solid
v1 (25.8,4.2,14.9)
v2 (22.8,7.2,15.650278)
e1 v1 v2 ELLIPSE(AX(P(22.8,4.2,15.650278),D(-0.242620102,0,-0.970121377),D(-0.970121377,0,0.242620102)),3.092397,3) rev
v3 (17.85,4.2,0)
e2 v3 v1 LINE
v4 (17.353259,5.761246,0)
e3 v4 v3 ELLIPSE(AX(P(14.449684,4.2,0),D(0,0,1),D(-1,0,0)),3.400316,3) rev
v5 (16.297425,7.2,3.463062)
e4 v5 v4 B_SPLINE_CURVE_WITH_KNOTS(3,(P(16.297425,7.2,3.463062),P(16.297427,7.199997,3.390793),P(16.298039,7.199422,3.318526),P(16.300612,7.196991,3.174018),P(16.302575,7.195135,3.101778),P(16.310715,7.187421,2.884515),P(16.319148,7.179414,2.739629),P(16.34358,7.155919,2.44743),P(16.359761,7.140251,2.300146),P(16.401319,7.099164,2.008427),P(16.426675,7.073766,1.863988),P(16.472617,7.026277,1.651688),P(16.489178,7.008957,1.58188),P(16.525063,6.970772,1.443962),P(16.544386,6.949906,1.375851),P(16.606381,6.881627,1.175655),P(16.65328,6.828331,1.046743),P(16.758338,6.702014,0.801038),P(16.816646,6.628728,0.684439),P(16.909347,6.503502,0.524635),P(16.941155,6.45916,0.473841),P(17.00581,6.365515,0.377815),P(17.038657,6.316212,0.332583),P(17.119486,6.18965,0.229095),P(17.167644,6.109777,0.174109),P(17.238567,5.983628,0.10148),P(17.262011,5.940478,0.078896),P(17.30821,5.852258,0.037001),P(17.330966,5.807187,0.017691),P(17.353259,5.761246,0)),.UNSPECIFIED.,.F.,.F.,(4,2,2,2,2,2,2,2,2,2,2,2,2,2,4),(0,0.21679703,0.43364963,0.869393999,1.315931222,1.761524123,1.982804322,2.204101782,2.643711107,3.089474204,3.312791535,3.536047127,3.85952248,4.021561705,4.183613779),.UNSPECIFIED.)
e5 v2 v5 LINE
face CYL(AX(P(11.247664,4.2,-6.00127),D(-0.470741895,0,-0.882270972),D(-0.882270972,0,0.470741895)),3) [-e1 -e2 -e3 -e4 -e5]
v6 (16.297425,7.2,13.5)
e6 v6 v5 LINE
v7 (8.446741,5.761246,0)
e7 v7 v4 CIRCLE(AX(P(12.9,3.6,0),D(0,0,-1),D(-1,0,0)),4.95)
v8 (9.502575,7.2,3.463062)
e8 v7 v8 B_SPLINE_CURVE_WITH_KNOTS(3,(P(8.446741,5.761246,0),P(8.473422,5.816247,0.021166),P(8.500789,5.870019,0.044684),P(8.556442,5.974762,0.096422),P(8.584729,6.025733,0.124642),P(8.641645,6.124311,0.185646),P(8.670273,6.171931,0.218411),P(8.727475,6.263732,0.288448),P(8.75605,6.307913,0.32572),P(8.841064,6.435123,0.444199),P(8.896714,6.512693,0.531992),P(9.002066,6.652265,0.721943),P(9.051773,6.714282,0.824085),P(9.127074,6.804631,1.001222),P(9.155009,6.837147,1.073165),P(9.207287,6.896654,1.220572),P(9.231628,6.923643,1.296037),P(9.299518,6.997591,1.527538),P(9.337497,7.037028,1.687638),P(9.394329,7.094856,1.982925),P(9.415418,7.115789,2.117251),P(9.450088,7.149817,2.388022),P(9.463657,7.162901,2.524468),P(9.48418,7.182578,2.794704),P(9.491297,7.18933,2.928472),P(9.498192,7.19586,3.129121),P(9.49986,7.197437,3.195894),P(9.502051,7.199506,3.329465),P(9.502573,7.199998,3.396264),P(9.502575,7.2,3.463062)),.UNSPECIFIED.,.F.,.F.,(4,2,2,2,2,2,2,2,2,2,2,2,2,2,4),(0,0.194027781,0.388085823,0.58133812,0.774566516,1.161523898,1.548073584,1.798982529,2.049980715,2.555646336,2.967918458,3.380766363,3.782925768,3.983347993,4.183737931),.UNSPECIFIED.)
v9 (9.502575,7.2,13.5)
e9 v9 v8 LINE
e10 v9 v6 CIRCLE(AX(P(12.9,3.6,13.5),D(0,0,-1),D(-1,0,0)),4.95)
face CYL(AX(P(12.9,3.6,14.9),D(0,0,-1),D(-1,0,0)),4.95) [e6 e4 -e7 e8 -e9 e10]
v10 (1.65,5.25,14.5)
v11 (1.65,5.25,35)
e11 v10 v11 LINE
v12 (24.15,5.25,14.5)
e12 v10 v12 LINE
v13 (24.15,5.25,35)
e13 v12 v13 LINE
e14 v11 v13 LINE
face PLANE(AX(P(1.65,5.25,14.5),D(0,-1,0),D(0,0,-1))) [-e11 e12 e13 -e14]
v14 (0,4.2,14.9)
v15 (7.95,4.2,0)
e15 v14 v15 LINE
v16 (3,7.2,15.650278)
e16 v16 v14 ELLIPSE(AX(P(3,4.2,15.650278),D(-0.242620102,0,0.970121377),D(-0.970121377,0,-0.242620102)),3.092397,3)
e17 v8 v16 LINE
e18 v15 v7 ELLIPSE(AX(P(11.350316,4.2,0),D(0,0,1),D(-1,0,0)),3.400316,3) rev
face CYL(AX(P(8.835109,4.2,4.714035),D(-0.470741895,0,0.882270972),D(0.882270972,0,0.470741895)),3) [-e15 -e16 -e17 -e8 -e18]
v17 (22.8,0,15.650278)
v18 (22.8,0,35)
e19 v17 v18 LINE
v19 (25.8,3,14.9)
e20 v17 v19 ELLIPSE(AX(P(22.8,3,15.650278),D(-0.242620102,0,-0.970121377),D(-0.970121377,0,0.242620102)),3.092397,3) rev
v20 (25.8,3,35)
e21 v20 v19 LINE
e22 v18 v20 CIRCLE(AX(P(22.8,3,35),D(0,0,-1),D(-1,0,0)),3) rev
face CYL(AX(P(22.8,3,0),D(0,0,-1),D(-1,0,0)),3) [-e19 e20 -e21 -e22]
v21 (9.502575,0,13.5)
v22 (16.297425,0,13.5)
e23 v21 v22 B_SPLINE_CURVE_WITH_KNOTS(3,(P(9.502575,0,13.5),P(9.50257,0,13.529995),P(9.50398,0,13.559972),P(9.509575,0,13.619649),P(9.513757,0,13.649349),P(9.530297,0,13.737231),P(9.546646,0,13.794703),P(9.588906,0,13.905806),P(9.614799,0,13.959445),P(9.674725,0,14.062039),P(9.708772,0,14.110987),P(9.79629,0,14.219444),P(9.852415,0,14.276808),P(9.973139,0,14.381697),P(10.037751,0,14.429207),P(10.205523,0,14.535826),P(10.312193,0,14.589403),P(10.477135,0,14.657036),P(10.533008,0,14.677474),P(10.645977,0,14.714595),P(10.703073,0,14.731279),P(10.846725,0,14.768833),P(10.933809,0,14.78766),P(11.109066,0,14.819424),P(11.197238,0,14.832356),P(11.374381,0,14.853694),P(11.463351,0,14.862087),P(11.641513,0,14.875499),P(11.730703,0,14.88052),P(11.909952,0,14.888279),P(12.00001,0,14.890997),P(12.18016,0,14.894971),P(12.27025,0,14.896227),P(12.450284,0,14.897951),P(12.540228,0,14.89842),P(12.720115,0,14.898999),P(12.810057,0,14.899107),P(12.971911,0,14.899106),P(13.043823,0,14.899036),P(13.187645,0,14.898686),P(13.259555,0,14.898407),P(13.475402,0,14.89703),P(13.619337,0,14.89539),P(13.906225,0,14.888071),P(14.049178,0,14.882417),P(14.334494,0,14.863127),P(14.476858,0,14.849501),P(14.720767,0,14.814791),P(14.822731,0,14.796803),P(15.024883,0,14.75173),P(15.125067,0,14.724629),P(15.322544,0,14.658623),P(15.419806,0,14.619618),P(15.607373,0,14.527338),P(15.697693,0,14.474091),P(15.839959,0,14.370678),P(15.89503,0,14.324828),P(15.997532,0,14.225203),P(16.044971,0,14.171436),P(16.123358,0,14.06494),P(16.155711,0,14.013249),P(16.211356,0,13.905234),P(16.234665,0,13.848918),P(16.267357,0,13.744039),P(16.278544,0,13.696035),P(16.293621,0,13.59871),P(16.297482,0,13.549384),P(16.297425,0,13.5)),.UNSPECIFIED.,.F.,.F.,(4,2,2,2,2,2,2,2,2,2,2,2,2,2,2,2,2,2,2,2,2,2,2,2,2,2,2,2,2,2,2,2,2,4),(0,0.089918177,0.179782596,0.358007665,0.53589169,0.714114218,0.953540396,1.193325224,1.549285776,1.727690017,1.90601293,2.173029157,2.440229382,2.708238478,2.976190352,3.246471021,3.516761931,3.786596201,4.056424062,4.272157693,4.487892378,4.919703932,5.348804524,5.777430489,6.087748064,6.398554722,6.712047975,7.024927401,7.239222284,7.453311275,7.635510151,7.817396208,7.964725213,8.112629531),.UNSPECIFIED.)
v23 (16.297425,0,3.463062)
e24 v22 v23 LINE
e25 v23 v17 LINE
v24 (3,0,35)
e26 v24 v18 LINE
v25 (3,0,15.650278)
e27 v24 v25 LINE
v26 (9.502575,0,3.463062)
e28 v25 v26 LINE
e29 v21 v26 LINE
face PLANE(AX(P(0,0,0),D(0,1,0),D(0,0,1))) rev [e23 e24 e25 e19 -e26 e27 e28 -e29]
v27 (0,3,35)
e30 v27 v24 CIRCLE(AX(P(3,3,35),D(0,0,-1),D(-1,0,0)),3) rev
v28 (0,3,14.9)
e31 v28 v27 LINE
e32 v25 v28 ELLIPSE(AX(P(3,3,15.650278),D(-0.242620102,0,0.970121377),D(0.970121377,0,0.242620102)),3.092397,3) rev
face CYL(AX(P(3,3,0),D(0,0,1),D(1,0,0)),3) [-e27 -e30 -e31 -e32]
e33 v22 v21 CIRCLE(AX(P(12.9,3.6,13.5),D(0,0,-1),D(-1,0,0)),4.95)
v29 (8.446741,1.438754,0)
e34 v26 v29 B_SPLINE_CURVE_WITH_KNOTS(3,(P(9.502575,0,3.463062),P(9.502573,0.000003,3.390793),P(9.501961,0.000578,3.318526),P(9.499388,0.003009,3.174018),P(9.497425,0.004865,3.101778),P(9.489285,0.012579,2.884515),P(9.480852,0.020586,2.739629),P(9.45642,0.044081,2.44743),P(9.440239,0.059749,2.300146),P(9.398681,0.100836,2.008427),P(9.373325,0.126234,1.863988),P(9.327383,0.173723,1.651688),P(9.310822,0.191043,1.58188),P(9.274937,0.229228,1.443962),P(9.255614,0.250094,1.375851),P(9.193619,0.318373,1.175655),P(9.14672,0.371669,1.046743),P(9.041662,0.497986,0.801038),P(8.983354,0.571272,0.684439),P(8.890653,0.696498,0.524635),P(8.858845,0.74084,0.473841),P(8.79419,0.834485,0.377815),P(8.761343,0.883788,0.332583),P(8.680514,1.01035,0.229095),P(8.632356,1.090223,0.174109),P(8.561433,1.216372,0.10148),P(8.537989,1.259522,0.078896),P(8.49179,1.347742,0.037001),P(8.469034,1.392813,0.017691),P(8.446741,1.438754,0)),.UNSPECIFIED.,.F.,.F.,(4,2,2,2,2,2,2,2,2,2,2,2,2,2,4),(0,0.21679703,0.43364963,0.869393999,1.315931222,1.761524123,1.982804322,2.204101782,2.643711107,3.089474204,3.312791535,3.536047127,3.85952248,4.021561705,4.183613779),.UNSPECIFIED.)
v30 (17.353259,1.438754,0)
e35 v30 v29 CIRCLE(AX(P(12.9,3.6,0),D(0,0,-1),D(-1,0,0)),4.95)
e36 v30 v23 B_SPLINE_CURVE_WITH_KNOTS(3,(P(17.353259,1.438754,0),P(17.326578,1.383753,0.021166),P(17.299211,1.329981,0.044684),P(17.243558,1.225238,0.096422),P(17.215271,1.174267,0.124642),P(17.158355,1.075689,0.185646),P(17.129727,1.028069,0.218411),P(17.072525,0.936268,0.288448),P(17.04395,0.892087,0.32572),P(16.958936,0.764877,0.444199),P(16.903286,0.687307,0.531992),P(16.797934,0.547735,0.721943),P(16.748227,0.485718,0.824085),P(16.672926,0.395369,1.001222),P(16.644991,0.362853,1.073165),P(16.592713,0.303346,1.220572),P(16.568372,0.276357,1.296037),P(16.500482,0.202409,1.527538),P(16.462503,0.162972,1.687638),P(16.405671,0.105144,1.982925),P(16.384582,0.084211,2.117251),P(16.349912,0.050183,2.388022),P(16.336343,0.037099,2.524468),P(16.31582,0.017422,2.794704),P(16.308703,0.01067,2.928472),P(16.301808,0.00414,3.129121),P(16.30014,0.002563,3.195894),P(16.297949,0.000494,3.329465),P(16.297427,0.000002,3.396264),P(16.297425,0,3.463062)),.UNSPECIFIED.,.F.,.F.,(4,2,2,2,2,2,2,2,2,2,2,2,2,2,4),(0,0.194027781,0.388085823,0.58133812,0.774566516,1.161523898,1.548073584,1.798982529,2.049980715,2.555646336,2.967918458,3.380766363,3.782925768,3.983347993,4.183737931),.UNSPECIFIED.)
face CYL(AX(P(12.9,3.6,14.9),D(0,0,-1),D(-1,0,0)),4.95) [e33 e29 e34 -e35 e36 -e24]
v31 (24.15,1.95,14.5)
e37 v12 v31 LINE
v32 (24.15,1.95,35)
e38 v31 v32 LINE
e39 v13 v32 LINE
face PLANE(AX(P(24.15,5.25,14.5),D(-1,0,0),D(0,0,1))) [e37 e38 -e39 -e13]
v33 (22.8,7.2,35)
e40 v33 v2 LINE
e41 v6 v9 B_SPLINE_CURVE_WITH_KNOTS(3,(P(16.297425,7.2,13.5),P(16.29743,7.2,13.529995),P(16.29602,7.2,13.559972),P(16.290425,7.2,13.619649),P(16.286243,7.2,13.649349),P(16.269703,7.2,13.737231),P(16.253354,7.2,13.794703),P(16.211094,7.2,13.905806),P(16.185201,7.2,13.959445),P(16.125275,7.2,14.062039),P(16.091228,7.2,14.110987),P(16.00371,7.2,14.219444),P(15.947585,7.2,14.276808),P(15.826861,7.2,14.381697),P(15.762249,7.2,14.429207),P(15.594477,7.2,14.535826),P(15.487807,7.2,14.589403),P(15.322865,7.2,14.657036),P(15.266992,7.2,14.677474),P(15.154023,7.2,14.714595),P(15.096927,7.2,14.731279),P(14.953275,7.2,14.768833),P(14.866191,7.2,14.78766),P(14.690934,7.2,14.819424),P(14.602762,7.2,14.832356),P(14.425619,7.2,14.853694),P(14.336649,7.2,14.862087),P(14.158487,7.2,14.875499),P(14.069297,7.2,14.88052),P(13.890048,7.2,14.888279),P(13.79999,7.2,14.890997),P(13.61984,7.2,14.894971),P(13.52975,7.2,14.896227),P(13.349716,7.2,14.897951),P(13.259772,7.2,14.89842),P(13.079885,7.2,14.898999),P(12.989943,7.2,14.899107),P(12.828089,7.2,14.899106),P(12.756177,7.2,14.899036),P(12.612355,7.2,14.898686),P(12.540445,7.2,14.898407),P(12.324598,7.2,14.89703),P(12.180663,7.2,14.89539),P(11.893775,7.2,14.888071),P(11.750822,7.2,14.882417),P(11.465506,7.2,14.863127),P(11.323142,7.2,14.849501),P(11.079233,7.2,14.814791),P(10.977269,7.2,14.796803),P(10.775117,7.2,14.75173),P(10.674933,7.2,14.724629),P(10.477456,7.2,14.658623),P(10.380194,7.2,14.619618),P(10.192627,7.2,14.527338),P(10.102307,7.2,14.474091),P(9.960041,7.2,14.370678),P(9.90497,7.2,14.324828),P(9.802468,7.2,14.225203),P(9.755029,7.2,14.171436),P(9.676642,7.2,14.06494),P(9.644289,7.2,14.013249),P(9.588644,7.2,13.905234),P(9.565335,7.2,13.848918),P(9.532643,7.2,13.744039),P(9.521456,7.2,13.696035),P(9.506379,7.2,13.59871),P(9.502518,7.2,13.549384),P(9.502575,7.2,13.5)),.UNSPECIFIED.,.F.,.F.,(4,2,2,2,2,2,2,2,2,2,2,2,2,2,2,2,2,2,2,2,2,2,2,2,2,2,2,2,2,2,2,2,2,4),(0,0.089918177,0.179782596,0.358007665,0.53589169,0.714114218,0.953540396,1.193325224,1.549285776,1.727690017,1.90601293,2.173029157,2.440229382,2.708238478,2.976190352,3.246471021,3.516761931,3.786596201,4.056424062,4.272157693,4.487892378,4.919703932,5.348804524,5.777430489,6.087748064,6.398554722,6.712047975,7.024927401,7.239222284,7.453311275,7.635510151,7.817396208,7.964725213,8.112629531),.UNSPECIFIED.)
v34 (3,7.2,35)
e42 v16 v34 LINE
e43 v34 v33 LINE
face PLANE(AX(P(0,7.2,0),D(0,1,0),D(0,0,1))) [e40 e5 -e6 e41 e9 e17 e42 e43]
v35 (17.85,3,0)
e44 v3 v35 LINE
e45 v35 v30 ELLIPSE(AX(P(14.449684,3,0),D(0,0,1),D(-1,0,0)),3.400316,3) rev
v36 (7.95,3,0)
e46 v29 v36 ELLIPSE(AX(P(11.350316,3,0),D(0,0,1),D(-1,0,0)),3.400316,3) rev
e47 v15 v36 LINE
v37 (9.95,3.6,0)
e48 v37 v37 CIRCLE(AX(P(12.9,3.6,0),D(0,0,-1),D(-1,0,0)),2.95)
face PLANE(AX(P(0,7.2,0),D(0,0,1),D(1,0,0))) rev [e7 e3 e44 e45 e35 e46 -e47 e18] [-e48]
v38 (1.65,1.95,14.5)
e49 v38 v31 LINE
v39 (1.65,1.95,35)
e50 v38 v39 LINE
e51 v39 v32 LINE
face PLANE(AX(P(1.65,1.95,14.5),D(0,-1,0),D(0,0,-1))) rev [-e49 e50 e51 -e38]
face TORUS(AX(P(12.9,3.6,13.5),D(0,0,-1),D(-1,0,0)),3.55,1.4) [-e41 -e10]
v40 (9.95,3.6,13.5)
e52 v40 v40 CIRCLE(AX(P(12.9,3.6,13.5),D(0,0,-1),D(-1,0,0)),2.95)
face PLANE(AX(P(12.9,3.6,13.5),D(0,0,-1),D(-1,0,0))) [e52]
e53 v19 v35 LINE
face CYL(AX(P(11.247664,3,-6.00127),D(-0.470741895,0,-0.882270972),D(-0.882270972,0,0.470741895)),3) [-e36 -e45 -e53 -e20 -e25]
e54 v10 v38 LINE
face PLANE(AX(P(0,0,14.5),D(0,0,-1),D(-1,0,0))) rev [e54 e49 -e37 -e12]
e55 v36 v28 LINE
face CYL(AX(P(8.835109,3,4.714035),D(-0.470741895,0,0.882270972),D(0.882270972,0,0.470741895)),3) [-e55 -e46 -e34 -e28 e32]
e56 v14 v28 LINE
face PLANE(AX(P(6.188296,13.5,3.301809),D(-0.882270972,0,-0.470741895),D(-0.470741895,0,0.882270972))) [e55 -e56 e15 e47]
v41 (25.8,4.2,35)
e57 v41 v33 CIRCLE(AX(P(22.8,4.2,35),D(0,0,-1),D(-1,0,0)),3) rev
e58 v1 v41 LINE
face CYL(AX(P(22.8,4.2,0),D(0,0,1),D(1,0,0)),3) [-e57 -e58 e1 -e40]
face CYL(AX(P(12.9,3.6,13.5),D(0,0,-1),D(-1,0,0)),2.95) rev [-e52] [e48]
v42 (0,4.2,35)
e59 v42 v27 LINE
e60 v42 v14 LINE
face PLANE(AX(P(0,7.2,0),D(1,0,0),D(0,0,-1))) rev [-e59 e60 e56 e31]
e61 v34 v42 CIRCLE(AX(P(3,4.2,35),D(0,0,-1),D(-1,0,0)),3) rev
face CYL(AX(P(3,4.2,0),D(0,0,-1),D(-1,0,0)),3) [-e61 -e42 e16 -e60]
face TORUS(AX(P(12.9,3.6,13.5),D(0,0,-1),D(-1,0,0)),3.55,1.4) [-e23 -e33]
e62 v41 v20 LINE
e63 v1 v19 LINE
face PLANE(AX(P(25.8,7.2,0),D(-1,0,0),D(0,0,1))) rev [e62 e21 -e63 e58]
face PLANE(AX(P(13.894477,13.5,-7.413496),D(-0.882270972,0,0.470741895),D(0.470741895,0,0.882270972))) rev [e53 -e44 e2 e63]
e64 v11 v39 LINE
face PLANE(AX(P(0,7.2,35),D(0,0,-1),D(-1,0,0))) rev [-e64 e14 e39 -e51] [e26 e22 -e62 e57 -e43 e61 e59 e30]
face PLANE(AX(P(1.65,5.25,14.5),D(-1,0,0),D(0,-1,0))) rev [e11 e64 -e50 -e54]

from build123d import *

# Parameters (mm, degrees)
SKETCH1_W           = 25.8
SKETCH1_H           = 35
BOSS_EXTRUDE1_DEPTH = 7.2
SKETCH3_W           = 22.5
SKETCH3_H           = 3.3
CUT_EXTRUDE1_DEPTH  = 20.5
BOSS_EXTRUDE2_DEPTH = 14.9
SKETCH6_R           = 2.95
CUT_EXTRUDE3_DEPTH  = 13.5
FILLET1_R           = 1.4
FILLET2_R           = 1.4
CUT_EXTRUDE4_DEPTH  = 13.5
FILLET5_R           = 3


with BuildPart() as part:
    # Sketch1 → Boss-Extrude1 (new body)
    with BuildSketch(Plane(origin=(0, 0, 0), x_dir=(1, 0, 0), z_dir=(0, 1, 0))):
        with Locations((12.9, -17.5)):
            Rectangle(SKETCH1_W, SKETCH1_H)
    extrude(amount=BOSS_EXTRUDE1_DEPTH)

    # Sketch3 → Cut-Extrude1 (cut)
    with BuildSketch(Plane.XY.offset(35)):
        with Locations((12.9, 3.6)):
            Rectangle(SKETCH3_W, SKETCH3_H)
    extrude(amount=-CUT_EXTRUDE1_DEPTH, mode=Mode.SUBTRACT)

    # Sketch5 → Boss-Extrude2 (add)
    with BuildSketch(Plane(origin=(0, 0, 0), x_dir=(-1, 0, 0), z_dir=(0, 0, -1))):
        with BuildLine():
            Line((-16.297425496, 7.2), (-12.9, 7.2))
            Line((-12.9, 7.2), (-9.502574504, 7.2))
            ThreePointArc((-9.502574504, 7.2), (-12.9, 8.55), (-16.297425496, 7.2))
        make_face()
        with BuildLine():
            Line((-9.502574504, 0), (-12.9, 0))
            Line((-12.9, 0), (-16.297425496, 0))
            ThreePointArc((-16.297425496, 0), (-12.9, -1.35), (-9.502574504, 0))
        make_face()
    extrude(amount=-BOSS_EXTRUDE2_DEPTH)

    # Sketch6 → Cut-Extrude3 (cut)
    with BuildSketch(Plane(origin=(0, 0, 0), x_dir=(-1, 0, 0), z_dir=(0, 0, -1))):
        with Locations((-12.9, 3.6)):
            Circle(SKETCH6_R)
    extrude(amount=-CUT_EXTRUDE3_DEPTH, mode=Mode.SUBTRACT)

    # Fillet1
    # the kernel refuses this fillet: 1.4 mm, written as the material it takes off along each edge
    with BuildSketch(Plane(origin=(12.9, 3.6, 14.9), x_dir=(-0.9942803452588228, 0.10680166212187986, 0), z_dir=(-0.10680166212187986, -0.9942803452588228, 0))) as fillet1_piece_1_section:
        with BuildLine():
            CenterArc((4.95 - FILLET1_R, FILLET1_R), FILLET1_R, 270, 90)
            Line((4.95 - FILLET1_R, 0), (4.95, 0))
            Line((4.95, 0), (4.95, FILLET1_R))
        make_face()
    fillet1_piece_1 = revolve(axis=Axis((12.9, 3.6, 14.9), (0, 0, -1)), revolution_arc=167.738044053, mode=Mode.PRIVATE)
    fillet1_piece_1 = split(fillet1_piece_1, bisect_by=Plane(origin=(12.9, 7.2, 14.482271144), z_dir=(0, 1, 0)), keep=Keep.TOP, mode=Mode.PRIVATE)
    add(fillet1_piece_1, mode=Mode.SUBTRACT)

    # Fillet2
    # the kernel refuses this fillet: 1.4 mm, written as the material it takes off along each edge
    with BuildSketch(Plane(origin=(12.9, 3.6, 14.9), x_dir=(0.9942803452588191, -0.10680166212191289, 0), z_dir=(0.10680166212191289, 0.9942803452588191, 0))) as fillet2_piece_1_section:
        with BuildLine():
            CenterArc((4.95 - FILLET2_R, FILLET2_R), FILLET2_R, 270, 90)
            Line((4.95 - FILLET2_R, 0), (4.95, 0))
            Line((4.95, 0), (4.95, FILLET2_R))
        make_face()
    fillet2_piece_1 = revolve(axis=Axis((12.9, 3.6, 14.9), (0, 0, -1)), revolution_arc=167.738044053, mode=Mode.PRIVATE)
    fillet2_piece_1 = split(fillet2_piece_1, bisect_by=Plane(origin=(12.9, 0, 14.482271144), z_dir=(0, -1, 0)), keep=Keep.TOP, mode=Mode.PRIVATE)
    add(fillet2_piece_1, mode=Mode.SUBTRACT)

    # Sketch7 → Cut-Extrude4 (cut)
    with BuildSketch(Plane(origin=(0, 0, 0), x_dir=(-1, 0, 0), z_dir=(0, -1, 0))):
        Polygon((-17.85, 0), (-25.8, 0), (-25.8, -14.9), align=None)
        Polygon((0, -14.9), (0, 0), (-7.95, 0), align=None)
    extrude(amount=-CUT_EXTRUDE4_DEPTH, mode=Mode.SUBTRACT)

    # Fillet5
    # the kernel refuses this fillet: 3 mm, written as the material it takes off along each edge
    with BuildSketch(Plane(origin=(25.8, 7.2, 7.4), x_dir=(-1, 0, 0), z_dir=(0, 0, 1)), Plane(origin=(0, 7.2, 42.5), x_dir=(1, 0, 0), z_dir=(0, 0, -1))) as fillet5_piece_1:
        with BuildLine():
            CenterArc((FILLET5_R, FILLET5_R), FILLET5_R, 180, 90)
            Line((0, FILLET5_R), (0, 0))
            Line((0, 0), (FILLET5_R, 0))
        make_face()
    extrude(amount=35.1, mode=Mode.SUBTRACT)
    with BuildSketch(Plane(origin=(25.8, 0, 7.4), x_dir=(-1, 0, 0), z_dir=(0, 0, 1)), Plane(origin=(0, 0, 42.5), x_dir=(1, 0, 0), z_dir=(0, 0, -1))) as fillet5_piece_2:
        with BuildLine():
            CenterArc((FILLET5_R, -FILLET5_R), FILLET5_R, 90, 90)
            Line((0, -FILLET5_R), (0, 0))
            Line((0, 0), (FILLET5_R, 0))
        make_face()
    extrude(amount=35.1, mode=Mode.SUBTRACT)
    with BuildSketch(Plane(origin=(29.33056421, 7.2, 21.517032293), x_dir=(0, -1, 0), z_dir=(-0.4707418946375641, 0, -0.8822709723395848))) as fillet5_piece_3_section:
        with BuildLine():
            CenterArc((FILLET5_R, FILLET5_R), FILLET5_R, 180, 90)
            Line((0, FILLET5_R), (0, 0))
            Line((0, 0), (FILLET5_R, 0))
        make_face()
    fillet5_piece_3 = extrude(amount=31.88823555, mode=Mode.PRIVATE)
    fillet5_piece_3 = fillet5_piece_3 - Plane(origin=(12.9, 3.6, 8.289630093), x_dir=(-0.6863485850246219, 0.7272727272727194, 0), z_dir=(0, 0, -1)) * Cylinder(4.95, 76, mode=Mode.PRIVATE)
    add(fillet5_piece_3, mode=Mode.SUBTRACT)
    with BuildSketch(Plane(origin=(29.33056421, 0, 21.517032293), x_dir=(-0.8822709723395848, 0, 0.4707418946375641), z_dir=(-0.4707418946375641, 0, -0.8822709723395848))) as fillet5_piece_4_section:
        with BuildLine():
            CenterArc((FILLET5_R, FILLET5_R), FILLET5_R, 180, 90)
            Line((0, FILLET5_R), (0, 0))
            Line((0, 0), (FILLET5_R, 0))
        make_face()
    fillet5_piece_4 = extrude(amount=31.88823555, mode=Mode.PRIVATE)
    fillet5_piece_4 = fillet5_piece_4 - Plane(origin=(12.9, 3.6, 8.289627813), x_dir=(0.6863485850245981, -0.727272727272742, 0), z_dir=(0, 0, -1)) * Cylinder(4.95, 76, mode=Mode.PRIVATE)
    add(fillet5_piece_4, mode=Mode.SUBTRACT)
    with BuildSketch(Plane(origin=(11.48056421, 7.2, -6.617032293), x_dir=(0.8822709723395851, 0, 0.4707418946375639), z_dir=(-0.4707418946375639, 0, 0.882270972339585))) as fillet5_piece_5_section:
        with BuildLine():
            CenterArc((FILLET5_R, -FILLET5_R), FILLET5_R, 90, 90)
            Line((0, -FILLET5_R), (0, 0))
            Line((0, 0), (FILLET5_R, 0))
        make_face()
    fillet5_piece_5 = extrude(amount=31.88823555, mode=Mode.PRIVATE)
    fillet5_piece_5 = fillet5_piece_5 - Plane(origin=(12.9, 3.6, 8.289627632), x_dir=(-0.6863485850246219, 0.7272727272727194, 0), z_dir=(0, 0, -1)) * Cylinder(4.95, 76, mode=Mode.PRIVATE)
    add(fillet5_piece_5, mode=Mode.SUBTRACT)
    with BuildSketch(Plane(origin=(11.48056421, 0, -6.617032293), x_dir=(0.8822709723395851, 0, 0.4707418946375639), z_dir=(-0.4707418946375639, 0, 0.882270972339585))) as fillet5_piece_6_section:
        with BuildLine():
            CenterArc((FILLET5_R, FILLET5_R), FILLET5_R, 180, 90)
            Line((0, FILLET5_R), (0, 0))
            Line((0, 0), (FILLET5_R, 0))
        make_face()
    fillet5_piece_6 = extrude(amount=31.88823555, mode=Mode.PRIVATE)
    fillet5_piece_6 = fillet5_piece_6 - Plane(origin=(12.9, 3.6, 8.289629174), x_dir=(0.6863485850245981, -0.727272727272742, 0), z_dir=(0, 0, -1)) * Cylinder(4.95, 76, mode=Mode.PRIVATE)
    add(fillet5_piece_6, mode=Mode.SUBTRACT)


solid = part.part
